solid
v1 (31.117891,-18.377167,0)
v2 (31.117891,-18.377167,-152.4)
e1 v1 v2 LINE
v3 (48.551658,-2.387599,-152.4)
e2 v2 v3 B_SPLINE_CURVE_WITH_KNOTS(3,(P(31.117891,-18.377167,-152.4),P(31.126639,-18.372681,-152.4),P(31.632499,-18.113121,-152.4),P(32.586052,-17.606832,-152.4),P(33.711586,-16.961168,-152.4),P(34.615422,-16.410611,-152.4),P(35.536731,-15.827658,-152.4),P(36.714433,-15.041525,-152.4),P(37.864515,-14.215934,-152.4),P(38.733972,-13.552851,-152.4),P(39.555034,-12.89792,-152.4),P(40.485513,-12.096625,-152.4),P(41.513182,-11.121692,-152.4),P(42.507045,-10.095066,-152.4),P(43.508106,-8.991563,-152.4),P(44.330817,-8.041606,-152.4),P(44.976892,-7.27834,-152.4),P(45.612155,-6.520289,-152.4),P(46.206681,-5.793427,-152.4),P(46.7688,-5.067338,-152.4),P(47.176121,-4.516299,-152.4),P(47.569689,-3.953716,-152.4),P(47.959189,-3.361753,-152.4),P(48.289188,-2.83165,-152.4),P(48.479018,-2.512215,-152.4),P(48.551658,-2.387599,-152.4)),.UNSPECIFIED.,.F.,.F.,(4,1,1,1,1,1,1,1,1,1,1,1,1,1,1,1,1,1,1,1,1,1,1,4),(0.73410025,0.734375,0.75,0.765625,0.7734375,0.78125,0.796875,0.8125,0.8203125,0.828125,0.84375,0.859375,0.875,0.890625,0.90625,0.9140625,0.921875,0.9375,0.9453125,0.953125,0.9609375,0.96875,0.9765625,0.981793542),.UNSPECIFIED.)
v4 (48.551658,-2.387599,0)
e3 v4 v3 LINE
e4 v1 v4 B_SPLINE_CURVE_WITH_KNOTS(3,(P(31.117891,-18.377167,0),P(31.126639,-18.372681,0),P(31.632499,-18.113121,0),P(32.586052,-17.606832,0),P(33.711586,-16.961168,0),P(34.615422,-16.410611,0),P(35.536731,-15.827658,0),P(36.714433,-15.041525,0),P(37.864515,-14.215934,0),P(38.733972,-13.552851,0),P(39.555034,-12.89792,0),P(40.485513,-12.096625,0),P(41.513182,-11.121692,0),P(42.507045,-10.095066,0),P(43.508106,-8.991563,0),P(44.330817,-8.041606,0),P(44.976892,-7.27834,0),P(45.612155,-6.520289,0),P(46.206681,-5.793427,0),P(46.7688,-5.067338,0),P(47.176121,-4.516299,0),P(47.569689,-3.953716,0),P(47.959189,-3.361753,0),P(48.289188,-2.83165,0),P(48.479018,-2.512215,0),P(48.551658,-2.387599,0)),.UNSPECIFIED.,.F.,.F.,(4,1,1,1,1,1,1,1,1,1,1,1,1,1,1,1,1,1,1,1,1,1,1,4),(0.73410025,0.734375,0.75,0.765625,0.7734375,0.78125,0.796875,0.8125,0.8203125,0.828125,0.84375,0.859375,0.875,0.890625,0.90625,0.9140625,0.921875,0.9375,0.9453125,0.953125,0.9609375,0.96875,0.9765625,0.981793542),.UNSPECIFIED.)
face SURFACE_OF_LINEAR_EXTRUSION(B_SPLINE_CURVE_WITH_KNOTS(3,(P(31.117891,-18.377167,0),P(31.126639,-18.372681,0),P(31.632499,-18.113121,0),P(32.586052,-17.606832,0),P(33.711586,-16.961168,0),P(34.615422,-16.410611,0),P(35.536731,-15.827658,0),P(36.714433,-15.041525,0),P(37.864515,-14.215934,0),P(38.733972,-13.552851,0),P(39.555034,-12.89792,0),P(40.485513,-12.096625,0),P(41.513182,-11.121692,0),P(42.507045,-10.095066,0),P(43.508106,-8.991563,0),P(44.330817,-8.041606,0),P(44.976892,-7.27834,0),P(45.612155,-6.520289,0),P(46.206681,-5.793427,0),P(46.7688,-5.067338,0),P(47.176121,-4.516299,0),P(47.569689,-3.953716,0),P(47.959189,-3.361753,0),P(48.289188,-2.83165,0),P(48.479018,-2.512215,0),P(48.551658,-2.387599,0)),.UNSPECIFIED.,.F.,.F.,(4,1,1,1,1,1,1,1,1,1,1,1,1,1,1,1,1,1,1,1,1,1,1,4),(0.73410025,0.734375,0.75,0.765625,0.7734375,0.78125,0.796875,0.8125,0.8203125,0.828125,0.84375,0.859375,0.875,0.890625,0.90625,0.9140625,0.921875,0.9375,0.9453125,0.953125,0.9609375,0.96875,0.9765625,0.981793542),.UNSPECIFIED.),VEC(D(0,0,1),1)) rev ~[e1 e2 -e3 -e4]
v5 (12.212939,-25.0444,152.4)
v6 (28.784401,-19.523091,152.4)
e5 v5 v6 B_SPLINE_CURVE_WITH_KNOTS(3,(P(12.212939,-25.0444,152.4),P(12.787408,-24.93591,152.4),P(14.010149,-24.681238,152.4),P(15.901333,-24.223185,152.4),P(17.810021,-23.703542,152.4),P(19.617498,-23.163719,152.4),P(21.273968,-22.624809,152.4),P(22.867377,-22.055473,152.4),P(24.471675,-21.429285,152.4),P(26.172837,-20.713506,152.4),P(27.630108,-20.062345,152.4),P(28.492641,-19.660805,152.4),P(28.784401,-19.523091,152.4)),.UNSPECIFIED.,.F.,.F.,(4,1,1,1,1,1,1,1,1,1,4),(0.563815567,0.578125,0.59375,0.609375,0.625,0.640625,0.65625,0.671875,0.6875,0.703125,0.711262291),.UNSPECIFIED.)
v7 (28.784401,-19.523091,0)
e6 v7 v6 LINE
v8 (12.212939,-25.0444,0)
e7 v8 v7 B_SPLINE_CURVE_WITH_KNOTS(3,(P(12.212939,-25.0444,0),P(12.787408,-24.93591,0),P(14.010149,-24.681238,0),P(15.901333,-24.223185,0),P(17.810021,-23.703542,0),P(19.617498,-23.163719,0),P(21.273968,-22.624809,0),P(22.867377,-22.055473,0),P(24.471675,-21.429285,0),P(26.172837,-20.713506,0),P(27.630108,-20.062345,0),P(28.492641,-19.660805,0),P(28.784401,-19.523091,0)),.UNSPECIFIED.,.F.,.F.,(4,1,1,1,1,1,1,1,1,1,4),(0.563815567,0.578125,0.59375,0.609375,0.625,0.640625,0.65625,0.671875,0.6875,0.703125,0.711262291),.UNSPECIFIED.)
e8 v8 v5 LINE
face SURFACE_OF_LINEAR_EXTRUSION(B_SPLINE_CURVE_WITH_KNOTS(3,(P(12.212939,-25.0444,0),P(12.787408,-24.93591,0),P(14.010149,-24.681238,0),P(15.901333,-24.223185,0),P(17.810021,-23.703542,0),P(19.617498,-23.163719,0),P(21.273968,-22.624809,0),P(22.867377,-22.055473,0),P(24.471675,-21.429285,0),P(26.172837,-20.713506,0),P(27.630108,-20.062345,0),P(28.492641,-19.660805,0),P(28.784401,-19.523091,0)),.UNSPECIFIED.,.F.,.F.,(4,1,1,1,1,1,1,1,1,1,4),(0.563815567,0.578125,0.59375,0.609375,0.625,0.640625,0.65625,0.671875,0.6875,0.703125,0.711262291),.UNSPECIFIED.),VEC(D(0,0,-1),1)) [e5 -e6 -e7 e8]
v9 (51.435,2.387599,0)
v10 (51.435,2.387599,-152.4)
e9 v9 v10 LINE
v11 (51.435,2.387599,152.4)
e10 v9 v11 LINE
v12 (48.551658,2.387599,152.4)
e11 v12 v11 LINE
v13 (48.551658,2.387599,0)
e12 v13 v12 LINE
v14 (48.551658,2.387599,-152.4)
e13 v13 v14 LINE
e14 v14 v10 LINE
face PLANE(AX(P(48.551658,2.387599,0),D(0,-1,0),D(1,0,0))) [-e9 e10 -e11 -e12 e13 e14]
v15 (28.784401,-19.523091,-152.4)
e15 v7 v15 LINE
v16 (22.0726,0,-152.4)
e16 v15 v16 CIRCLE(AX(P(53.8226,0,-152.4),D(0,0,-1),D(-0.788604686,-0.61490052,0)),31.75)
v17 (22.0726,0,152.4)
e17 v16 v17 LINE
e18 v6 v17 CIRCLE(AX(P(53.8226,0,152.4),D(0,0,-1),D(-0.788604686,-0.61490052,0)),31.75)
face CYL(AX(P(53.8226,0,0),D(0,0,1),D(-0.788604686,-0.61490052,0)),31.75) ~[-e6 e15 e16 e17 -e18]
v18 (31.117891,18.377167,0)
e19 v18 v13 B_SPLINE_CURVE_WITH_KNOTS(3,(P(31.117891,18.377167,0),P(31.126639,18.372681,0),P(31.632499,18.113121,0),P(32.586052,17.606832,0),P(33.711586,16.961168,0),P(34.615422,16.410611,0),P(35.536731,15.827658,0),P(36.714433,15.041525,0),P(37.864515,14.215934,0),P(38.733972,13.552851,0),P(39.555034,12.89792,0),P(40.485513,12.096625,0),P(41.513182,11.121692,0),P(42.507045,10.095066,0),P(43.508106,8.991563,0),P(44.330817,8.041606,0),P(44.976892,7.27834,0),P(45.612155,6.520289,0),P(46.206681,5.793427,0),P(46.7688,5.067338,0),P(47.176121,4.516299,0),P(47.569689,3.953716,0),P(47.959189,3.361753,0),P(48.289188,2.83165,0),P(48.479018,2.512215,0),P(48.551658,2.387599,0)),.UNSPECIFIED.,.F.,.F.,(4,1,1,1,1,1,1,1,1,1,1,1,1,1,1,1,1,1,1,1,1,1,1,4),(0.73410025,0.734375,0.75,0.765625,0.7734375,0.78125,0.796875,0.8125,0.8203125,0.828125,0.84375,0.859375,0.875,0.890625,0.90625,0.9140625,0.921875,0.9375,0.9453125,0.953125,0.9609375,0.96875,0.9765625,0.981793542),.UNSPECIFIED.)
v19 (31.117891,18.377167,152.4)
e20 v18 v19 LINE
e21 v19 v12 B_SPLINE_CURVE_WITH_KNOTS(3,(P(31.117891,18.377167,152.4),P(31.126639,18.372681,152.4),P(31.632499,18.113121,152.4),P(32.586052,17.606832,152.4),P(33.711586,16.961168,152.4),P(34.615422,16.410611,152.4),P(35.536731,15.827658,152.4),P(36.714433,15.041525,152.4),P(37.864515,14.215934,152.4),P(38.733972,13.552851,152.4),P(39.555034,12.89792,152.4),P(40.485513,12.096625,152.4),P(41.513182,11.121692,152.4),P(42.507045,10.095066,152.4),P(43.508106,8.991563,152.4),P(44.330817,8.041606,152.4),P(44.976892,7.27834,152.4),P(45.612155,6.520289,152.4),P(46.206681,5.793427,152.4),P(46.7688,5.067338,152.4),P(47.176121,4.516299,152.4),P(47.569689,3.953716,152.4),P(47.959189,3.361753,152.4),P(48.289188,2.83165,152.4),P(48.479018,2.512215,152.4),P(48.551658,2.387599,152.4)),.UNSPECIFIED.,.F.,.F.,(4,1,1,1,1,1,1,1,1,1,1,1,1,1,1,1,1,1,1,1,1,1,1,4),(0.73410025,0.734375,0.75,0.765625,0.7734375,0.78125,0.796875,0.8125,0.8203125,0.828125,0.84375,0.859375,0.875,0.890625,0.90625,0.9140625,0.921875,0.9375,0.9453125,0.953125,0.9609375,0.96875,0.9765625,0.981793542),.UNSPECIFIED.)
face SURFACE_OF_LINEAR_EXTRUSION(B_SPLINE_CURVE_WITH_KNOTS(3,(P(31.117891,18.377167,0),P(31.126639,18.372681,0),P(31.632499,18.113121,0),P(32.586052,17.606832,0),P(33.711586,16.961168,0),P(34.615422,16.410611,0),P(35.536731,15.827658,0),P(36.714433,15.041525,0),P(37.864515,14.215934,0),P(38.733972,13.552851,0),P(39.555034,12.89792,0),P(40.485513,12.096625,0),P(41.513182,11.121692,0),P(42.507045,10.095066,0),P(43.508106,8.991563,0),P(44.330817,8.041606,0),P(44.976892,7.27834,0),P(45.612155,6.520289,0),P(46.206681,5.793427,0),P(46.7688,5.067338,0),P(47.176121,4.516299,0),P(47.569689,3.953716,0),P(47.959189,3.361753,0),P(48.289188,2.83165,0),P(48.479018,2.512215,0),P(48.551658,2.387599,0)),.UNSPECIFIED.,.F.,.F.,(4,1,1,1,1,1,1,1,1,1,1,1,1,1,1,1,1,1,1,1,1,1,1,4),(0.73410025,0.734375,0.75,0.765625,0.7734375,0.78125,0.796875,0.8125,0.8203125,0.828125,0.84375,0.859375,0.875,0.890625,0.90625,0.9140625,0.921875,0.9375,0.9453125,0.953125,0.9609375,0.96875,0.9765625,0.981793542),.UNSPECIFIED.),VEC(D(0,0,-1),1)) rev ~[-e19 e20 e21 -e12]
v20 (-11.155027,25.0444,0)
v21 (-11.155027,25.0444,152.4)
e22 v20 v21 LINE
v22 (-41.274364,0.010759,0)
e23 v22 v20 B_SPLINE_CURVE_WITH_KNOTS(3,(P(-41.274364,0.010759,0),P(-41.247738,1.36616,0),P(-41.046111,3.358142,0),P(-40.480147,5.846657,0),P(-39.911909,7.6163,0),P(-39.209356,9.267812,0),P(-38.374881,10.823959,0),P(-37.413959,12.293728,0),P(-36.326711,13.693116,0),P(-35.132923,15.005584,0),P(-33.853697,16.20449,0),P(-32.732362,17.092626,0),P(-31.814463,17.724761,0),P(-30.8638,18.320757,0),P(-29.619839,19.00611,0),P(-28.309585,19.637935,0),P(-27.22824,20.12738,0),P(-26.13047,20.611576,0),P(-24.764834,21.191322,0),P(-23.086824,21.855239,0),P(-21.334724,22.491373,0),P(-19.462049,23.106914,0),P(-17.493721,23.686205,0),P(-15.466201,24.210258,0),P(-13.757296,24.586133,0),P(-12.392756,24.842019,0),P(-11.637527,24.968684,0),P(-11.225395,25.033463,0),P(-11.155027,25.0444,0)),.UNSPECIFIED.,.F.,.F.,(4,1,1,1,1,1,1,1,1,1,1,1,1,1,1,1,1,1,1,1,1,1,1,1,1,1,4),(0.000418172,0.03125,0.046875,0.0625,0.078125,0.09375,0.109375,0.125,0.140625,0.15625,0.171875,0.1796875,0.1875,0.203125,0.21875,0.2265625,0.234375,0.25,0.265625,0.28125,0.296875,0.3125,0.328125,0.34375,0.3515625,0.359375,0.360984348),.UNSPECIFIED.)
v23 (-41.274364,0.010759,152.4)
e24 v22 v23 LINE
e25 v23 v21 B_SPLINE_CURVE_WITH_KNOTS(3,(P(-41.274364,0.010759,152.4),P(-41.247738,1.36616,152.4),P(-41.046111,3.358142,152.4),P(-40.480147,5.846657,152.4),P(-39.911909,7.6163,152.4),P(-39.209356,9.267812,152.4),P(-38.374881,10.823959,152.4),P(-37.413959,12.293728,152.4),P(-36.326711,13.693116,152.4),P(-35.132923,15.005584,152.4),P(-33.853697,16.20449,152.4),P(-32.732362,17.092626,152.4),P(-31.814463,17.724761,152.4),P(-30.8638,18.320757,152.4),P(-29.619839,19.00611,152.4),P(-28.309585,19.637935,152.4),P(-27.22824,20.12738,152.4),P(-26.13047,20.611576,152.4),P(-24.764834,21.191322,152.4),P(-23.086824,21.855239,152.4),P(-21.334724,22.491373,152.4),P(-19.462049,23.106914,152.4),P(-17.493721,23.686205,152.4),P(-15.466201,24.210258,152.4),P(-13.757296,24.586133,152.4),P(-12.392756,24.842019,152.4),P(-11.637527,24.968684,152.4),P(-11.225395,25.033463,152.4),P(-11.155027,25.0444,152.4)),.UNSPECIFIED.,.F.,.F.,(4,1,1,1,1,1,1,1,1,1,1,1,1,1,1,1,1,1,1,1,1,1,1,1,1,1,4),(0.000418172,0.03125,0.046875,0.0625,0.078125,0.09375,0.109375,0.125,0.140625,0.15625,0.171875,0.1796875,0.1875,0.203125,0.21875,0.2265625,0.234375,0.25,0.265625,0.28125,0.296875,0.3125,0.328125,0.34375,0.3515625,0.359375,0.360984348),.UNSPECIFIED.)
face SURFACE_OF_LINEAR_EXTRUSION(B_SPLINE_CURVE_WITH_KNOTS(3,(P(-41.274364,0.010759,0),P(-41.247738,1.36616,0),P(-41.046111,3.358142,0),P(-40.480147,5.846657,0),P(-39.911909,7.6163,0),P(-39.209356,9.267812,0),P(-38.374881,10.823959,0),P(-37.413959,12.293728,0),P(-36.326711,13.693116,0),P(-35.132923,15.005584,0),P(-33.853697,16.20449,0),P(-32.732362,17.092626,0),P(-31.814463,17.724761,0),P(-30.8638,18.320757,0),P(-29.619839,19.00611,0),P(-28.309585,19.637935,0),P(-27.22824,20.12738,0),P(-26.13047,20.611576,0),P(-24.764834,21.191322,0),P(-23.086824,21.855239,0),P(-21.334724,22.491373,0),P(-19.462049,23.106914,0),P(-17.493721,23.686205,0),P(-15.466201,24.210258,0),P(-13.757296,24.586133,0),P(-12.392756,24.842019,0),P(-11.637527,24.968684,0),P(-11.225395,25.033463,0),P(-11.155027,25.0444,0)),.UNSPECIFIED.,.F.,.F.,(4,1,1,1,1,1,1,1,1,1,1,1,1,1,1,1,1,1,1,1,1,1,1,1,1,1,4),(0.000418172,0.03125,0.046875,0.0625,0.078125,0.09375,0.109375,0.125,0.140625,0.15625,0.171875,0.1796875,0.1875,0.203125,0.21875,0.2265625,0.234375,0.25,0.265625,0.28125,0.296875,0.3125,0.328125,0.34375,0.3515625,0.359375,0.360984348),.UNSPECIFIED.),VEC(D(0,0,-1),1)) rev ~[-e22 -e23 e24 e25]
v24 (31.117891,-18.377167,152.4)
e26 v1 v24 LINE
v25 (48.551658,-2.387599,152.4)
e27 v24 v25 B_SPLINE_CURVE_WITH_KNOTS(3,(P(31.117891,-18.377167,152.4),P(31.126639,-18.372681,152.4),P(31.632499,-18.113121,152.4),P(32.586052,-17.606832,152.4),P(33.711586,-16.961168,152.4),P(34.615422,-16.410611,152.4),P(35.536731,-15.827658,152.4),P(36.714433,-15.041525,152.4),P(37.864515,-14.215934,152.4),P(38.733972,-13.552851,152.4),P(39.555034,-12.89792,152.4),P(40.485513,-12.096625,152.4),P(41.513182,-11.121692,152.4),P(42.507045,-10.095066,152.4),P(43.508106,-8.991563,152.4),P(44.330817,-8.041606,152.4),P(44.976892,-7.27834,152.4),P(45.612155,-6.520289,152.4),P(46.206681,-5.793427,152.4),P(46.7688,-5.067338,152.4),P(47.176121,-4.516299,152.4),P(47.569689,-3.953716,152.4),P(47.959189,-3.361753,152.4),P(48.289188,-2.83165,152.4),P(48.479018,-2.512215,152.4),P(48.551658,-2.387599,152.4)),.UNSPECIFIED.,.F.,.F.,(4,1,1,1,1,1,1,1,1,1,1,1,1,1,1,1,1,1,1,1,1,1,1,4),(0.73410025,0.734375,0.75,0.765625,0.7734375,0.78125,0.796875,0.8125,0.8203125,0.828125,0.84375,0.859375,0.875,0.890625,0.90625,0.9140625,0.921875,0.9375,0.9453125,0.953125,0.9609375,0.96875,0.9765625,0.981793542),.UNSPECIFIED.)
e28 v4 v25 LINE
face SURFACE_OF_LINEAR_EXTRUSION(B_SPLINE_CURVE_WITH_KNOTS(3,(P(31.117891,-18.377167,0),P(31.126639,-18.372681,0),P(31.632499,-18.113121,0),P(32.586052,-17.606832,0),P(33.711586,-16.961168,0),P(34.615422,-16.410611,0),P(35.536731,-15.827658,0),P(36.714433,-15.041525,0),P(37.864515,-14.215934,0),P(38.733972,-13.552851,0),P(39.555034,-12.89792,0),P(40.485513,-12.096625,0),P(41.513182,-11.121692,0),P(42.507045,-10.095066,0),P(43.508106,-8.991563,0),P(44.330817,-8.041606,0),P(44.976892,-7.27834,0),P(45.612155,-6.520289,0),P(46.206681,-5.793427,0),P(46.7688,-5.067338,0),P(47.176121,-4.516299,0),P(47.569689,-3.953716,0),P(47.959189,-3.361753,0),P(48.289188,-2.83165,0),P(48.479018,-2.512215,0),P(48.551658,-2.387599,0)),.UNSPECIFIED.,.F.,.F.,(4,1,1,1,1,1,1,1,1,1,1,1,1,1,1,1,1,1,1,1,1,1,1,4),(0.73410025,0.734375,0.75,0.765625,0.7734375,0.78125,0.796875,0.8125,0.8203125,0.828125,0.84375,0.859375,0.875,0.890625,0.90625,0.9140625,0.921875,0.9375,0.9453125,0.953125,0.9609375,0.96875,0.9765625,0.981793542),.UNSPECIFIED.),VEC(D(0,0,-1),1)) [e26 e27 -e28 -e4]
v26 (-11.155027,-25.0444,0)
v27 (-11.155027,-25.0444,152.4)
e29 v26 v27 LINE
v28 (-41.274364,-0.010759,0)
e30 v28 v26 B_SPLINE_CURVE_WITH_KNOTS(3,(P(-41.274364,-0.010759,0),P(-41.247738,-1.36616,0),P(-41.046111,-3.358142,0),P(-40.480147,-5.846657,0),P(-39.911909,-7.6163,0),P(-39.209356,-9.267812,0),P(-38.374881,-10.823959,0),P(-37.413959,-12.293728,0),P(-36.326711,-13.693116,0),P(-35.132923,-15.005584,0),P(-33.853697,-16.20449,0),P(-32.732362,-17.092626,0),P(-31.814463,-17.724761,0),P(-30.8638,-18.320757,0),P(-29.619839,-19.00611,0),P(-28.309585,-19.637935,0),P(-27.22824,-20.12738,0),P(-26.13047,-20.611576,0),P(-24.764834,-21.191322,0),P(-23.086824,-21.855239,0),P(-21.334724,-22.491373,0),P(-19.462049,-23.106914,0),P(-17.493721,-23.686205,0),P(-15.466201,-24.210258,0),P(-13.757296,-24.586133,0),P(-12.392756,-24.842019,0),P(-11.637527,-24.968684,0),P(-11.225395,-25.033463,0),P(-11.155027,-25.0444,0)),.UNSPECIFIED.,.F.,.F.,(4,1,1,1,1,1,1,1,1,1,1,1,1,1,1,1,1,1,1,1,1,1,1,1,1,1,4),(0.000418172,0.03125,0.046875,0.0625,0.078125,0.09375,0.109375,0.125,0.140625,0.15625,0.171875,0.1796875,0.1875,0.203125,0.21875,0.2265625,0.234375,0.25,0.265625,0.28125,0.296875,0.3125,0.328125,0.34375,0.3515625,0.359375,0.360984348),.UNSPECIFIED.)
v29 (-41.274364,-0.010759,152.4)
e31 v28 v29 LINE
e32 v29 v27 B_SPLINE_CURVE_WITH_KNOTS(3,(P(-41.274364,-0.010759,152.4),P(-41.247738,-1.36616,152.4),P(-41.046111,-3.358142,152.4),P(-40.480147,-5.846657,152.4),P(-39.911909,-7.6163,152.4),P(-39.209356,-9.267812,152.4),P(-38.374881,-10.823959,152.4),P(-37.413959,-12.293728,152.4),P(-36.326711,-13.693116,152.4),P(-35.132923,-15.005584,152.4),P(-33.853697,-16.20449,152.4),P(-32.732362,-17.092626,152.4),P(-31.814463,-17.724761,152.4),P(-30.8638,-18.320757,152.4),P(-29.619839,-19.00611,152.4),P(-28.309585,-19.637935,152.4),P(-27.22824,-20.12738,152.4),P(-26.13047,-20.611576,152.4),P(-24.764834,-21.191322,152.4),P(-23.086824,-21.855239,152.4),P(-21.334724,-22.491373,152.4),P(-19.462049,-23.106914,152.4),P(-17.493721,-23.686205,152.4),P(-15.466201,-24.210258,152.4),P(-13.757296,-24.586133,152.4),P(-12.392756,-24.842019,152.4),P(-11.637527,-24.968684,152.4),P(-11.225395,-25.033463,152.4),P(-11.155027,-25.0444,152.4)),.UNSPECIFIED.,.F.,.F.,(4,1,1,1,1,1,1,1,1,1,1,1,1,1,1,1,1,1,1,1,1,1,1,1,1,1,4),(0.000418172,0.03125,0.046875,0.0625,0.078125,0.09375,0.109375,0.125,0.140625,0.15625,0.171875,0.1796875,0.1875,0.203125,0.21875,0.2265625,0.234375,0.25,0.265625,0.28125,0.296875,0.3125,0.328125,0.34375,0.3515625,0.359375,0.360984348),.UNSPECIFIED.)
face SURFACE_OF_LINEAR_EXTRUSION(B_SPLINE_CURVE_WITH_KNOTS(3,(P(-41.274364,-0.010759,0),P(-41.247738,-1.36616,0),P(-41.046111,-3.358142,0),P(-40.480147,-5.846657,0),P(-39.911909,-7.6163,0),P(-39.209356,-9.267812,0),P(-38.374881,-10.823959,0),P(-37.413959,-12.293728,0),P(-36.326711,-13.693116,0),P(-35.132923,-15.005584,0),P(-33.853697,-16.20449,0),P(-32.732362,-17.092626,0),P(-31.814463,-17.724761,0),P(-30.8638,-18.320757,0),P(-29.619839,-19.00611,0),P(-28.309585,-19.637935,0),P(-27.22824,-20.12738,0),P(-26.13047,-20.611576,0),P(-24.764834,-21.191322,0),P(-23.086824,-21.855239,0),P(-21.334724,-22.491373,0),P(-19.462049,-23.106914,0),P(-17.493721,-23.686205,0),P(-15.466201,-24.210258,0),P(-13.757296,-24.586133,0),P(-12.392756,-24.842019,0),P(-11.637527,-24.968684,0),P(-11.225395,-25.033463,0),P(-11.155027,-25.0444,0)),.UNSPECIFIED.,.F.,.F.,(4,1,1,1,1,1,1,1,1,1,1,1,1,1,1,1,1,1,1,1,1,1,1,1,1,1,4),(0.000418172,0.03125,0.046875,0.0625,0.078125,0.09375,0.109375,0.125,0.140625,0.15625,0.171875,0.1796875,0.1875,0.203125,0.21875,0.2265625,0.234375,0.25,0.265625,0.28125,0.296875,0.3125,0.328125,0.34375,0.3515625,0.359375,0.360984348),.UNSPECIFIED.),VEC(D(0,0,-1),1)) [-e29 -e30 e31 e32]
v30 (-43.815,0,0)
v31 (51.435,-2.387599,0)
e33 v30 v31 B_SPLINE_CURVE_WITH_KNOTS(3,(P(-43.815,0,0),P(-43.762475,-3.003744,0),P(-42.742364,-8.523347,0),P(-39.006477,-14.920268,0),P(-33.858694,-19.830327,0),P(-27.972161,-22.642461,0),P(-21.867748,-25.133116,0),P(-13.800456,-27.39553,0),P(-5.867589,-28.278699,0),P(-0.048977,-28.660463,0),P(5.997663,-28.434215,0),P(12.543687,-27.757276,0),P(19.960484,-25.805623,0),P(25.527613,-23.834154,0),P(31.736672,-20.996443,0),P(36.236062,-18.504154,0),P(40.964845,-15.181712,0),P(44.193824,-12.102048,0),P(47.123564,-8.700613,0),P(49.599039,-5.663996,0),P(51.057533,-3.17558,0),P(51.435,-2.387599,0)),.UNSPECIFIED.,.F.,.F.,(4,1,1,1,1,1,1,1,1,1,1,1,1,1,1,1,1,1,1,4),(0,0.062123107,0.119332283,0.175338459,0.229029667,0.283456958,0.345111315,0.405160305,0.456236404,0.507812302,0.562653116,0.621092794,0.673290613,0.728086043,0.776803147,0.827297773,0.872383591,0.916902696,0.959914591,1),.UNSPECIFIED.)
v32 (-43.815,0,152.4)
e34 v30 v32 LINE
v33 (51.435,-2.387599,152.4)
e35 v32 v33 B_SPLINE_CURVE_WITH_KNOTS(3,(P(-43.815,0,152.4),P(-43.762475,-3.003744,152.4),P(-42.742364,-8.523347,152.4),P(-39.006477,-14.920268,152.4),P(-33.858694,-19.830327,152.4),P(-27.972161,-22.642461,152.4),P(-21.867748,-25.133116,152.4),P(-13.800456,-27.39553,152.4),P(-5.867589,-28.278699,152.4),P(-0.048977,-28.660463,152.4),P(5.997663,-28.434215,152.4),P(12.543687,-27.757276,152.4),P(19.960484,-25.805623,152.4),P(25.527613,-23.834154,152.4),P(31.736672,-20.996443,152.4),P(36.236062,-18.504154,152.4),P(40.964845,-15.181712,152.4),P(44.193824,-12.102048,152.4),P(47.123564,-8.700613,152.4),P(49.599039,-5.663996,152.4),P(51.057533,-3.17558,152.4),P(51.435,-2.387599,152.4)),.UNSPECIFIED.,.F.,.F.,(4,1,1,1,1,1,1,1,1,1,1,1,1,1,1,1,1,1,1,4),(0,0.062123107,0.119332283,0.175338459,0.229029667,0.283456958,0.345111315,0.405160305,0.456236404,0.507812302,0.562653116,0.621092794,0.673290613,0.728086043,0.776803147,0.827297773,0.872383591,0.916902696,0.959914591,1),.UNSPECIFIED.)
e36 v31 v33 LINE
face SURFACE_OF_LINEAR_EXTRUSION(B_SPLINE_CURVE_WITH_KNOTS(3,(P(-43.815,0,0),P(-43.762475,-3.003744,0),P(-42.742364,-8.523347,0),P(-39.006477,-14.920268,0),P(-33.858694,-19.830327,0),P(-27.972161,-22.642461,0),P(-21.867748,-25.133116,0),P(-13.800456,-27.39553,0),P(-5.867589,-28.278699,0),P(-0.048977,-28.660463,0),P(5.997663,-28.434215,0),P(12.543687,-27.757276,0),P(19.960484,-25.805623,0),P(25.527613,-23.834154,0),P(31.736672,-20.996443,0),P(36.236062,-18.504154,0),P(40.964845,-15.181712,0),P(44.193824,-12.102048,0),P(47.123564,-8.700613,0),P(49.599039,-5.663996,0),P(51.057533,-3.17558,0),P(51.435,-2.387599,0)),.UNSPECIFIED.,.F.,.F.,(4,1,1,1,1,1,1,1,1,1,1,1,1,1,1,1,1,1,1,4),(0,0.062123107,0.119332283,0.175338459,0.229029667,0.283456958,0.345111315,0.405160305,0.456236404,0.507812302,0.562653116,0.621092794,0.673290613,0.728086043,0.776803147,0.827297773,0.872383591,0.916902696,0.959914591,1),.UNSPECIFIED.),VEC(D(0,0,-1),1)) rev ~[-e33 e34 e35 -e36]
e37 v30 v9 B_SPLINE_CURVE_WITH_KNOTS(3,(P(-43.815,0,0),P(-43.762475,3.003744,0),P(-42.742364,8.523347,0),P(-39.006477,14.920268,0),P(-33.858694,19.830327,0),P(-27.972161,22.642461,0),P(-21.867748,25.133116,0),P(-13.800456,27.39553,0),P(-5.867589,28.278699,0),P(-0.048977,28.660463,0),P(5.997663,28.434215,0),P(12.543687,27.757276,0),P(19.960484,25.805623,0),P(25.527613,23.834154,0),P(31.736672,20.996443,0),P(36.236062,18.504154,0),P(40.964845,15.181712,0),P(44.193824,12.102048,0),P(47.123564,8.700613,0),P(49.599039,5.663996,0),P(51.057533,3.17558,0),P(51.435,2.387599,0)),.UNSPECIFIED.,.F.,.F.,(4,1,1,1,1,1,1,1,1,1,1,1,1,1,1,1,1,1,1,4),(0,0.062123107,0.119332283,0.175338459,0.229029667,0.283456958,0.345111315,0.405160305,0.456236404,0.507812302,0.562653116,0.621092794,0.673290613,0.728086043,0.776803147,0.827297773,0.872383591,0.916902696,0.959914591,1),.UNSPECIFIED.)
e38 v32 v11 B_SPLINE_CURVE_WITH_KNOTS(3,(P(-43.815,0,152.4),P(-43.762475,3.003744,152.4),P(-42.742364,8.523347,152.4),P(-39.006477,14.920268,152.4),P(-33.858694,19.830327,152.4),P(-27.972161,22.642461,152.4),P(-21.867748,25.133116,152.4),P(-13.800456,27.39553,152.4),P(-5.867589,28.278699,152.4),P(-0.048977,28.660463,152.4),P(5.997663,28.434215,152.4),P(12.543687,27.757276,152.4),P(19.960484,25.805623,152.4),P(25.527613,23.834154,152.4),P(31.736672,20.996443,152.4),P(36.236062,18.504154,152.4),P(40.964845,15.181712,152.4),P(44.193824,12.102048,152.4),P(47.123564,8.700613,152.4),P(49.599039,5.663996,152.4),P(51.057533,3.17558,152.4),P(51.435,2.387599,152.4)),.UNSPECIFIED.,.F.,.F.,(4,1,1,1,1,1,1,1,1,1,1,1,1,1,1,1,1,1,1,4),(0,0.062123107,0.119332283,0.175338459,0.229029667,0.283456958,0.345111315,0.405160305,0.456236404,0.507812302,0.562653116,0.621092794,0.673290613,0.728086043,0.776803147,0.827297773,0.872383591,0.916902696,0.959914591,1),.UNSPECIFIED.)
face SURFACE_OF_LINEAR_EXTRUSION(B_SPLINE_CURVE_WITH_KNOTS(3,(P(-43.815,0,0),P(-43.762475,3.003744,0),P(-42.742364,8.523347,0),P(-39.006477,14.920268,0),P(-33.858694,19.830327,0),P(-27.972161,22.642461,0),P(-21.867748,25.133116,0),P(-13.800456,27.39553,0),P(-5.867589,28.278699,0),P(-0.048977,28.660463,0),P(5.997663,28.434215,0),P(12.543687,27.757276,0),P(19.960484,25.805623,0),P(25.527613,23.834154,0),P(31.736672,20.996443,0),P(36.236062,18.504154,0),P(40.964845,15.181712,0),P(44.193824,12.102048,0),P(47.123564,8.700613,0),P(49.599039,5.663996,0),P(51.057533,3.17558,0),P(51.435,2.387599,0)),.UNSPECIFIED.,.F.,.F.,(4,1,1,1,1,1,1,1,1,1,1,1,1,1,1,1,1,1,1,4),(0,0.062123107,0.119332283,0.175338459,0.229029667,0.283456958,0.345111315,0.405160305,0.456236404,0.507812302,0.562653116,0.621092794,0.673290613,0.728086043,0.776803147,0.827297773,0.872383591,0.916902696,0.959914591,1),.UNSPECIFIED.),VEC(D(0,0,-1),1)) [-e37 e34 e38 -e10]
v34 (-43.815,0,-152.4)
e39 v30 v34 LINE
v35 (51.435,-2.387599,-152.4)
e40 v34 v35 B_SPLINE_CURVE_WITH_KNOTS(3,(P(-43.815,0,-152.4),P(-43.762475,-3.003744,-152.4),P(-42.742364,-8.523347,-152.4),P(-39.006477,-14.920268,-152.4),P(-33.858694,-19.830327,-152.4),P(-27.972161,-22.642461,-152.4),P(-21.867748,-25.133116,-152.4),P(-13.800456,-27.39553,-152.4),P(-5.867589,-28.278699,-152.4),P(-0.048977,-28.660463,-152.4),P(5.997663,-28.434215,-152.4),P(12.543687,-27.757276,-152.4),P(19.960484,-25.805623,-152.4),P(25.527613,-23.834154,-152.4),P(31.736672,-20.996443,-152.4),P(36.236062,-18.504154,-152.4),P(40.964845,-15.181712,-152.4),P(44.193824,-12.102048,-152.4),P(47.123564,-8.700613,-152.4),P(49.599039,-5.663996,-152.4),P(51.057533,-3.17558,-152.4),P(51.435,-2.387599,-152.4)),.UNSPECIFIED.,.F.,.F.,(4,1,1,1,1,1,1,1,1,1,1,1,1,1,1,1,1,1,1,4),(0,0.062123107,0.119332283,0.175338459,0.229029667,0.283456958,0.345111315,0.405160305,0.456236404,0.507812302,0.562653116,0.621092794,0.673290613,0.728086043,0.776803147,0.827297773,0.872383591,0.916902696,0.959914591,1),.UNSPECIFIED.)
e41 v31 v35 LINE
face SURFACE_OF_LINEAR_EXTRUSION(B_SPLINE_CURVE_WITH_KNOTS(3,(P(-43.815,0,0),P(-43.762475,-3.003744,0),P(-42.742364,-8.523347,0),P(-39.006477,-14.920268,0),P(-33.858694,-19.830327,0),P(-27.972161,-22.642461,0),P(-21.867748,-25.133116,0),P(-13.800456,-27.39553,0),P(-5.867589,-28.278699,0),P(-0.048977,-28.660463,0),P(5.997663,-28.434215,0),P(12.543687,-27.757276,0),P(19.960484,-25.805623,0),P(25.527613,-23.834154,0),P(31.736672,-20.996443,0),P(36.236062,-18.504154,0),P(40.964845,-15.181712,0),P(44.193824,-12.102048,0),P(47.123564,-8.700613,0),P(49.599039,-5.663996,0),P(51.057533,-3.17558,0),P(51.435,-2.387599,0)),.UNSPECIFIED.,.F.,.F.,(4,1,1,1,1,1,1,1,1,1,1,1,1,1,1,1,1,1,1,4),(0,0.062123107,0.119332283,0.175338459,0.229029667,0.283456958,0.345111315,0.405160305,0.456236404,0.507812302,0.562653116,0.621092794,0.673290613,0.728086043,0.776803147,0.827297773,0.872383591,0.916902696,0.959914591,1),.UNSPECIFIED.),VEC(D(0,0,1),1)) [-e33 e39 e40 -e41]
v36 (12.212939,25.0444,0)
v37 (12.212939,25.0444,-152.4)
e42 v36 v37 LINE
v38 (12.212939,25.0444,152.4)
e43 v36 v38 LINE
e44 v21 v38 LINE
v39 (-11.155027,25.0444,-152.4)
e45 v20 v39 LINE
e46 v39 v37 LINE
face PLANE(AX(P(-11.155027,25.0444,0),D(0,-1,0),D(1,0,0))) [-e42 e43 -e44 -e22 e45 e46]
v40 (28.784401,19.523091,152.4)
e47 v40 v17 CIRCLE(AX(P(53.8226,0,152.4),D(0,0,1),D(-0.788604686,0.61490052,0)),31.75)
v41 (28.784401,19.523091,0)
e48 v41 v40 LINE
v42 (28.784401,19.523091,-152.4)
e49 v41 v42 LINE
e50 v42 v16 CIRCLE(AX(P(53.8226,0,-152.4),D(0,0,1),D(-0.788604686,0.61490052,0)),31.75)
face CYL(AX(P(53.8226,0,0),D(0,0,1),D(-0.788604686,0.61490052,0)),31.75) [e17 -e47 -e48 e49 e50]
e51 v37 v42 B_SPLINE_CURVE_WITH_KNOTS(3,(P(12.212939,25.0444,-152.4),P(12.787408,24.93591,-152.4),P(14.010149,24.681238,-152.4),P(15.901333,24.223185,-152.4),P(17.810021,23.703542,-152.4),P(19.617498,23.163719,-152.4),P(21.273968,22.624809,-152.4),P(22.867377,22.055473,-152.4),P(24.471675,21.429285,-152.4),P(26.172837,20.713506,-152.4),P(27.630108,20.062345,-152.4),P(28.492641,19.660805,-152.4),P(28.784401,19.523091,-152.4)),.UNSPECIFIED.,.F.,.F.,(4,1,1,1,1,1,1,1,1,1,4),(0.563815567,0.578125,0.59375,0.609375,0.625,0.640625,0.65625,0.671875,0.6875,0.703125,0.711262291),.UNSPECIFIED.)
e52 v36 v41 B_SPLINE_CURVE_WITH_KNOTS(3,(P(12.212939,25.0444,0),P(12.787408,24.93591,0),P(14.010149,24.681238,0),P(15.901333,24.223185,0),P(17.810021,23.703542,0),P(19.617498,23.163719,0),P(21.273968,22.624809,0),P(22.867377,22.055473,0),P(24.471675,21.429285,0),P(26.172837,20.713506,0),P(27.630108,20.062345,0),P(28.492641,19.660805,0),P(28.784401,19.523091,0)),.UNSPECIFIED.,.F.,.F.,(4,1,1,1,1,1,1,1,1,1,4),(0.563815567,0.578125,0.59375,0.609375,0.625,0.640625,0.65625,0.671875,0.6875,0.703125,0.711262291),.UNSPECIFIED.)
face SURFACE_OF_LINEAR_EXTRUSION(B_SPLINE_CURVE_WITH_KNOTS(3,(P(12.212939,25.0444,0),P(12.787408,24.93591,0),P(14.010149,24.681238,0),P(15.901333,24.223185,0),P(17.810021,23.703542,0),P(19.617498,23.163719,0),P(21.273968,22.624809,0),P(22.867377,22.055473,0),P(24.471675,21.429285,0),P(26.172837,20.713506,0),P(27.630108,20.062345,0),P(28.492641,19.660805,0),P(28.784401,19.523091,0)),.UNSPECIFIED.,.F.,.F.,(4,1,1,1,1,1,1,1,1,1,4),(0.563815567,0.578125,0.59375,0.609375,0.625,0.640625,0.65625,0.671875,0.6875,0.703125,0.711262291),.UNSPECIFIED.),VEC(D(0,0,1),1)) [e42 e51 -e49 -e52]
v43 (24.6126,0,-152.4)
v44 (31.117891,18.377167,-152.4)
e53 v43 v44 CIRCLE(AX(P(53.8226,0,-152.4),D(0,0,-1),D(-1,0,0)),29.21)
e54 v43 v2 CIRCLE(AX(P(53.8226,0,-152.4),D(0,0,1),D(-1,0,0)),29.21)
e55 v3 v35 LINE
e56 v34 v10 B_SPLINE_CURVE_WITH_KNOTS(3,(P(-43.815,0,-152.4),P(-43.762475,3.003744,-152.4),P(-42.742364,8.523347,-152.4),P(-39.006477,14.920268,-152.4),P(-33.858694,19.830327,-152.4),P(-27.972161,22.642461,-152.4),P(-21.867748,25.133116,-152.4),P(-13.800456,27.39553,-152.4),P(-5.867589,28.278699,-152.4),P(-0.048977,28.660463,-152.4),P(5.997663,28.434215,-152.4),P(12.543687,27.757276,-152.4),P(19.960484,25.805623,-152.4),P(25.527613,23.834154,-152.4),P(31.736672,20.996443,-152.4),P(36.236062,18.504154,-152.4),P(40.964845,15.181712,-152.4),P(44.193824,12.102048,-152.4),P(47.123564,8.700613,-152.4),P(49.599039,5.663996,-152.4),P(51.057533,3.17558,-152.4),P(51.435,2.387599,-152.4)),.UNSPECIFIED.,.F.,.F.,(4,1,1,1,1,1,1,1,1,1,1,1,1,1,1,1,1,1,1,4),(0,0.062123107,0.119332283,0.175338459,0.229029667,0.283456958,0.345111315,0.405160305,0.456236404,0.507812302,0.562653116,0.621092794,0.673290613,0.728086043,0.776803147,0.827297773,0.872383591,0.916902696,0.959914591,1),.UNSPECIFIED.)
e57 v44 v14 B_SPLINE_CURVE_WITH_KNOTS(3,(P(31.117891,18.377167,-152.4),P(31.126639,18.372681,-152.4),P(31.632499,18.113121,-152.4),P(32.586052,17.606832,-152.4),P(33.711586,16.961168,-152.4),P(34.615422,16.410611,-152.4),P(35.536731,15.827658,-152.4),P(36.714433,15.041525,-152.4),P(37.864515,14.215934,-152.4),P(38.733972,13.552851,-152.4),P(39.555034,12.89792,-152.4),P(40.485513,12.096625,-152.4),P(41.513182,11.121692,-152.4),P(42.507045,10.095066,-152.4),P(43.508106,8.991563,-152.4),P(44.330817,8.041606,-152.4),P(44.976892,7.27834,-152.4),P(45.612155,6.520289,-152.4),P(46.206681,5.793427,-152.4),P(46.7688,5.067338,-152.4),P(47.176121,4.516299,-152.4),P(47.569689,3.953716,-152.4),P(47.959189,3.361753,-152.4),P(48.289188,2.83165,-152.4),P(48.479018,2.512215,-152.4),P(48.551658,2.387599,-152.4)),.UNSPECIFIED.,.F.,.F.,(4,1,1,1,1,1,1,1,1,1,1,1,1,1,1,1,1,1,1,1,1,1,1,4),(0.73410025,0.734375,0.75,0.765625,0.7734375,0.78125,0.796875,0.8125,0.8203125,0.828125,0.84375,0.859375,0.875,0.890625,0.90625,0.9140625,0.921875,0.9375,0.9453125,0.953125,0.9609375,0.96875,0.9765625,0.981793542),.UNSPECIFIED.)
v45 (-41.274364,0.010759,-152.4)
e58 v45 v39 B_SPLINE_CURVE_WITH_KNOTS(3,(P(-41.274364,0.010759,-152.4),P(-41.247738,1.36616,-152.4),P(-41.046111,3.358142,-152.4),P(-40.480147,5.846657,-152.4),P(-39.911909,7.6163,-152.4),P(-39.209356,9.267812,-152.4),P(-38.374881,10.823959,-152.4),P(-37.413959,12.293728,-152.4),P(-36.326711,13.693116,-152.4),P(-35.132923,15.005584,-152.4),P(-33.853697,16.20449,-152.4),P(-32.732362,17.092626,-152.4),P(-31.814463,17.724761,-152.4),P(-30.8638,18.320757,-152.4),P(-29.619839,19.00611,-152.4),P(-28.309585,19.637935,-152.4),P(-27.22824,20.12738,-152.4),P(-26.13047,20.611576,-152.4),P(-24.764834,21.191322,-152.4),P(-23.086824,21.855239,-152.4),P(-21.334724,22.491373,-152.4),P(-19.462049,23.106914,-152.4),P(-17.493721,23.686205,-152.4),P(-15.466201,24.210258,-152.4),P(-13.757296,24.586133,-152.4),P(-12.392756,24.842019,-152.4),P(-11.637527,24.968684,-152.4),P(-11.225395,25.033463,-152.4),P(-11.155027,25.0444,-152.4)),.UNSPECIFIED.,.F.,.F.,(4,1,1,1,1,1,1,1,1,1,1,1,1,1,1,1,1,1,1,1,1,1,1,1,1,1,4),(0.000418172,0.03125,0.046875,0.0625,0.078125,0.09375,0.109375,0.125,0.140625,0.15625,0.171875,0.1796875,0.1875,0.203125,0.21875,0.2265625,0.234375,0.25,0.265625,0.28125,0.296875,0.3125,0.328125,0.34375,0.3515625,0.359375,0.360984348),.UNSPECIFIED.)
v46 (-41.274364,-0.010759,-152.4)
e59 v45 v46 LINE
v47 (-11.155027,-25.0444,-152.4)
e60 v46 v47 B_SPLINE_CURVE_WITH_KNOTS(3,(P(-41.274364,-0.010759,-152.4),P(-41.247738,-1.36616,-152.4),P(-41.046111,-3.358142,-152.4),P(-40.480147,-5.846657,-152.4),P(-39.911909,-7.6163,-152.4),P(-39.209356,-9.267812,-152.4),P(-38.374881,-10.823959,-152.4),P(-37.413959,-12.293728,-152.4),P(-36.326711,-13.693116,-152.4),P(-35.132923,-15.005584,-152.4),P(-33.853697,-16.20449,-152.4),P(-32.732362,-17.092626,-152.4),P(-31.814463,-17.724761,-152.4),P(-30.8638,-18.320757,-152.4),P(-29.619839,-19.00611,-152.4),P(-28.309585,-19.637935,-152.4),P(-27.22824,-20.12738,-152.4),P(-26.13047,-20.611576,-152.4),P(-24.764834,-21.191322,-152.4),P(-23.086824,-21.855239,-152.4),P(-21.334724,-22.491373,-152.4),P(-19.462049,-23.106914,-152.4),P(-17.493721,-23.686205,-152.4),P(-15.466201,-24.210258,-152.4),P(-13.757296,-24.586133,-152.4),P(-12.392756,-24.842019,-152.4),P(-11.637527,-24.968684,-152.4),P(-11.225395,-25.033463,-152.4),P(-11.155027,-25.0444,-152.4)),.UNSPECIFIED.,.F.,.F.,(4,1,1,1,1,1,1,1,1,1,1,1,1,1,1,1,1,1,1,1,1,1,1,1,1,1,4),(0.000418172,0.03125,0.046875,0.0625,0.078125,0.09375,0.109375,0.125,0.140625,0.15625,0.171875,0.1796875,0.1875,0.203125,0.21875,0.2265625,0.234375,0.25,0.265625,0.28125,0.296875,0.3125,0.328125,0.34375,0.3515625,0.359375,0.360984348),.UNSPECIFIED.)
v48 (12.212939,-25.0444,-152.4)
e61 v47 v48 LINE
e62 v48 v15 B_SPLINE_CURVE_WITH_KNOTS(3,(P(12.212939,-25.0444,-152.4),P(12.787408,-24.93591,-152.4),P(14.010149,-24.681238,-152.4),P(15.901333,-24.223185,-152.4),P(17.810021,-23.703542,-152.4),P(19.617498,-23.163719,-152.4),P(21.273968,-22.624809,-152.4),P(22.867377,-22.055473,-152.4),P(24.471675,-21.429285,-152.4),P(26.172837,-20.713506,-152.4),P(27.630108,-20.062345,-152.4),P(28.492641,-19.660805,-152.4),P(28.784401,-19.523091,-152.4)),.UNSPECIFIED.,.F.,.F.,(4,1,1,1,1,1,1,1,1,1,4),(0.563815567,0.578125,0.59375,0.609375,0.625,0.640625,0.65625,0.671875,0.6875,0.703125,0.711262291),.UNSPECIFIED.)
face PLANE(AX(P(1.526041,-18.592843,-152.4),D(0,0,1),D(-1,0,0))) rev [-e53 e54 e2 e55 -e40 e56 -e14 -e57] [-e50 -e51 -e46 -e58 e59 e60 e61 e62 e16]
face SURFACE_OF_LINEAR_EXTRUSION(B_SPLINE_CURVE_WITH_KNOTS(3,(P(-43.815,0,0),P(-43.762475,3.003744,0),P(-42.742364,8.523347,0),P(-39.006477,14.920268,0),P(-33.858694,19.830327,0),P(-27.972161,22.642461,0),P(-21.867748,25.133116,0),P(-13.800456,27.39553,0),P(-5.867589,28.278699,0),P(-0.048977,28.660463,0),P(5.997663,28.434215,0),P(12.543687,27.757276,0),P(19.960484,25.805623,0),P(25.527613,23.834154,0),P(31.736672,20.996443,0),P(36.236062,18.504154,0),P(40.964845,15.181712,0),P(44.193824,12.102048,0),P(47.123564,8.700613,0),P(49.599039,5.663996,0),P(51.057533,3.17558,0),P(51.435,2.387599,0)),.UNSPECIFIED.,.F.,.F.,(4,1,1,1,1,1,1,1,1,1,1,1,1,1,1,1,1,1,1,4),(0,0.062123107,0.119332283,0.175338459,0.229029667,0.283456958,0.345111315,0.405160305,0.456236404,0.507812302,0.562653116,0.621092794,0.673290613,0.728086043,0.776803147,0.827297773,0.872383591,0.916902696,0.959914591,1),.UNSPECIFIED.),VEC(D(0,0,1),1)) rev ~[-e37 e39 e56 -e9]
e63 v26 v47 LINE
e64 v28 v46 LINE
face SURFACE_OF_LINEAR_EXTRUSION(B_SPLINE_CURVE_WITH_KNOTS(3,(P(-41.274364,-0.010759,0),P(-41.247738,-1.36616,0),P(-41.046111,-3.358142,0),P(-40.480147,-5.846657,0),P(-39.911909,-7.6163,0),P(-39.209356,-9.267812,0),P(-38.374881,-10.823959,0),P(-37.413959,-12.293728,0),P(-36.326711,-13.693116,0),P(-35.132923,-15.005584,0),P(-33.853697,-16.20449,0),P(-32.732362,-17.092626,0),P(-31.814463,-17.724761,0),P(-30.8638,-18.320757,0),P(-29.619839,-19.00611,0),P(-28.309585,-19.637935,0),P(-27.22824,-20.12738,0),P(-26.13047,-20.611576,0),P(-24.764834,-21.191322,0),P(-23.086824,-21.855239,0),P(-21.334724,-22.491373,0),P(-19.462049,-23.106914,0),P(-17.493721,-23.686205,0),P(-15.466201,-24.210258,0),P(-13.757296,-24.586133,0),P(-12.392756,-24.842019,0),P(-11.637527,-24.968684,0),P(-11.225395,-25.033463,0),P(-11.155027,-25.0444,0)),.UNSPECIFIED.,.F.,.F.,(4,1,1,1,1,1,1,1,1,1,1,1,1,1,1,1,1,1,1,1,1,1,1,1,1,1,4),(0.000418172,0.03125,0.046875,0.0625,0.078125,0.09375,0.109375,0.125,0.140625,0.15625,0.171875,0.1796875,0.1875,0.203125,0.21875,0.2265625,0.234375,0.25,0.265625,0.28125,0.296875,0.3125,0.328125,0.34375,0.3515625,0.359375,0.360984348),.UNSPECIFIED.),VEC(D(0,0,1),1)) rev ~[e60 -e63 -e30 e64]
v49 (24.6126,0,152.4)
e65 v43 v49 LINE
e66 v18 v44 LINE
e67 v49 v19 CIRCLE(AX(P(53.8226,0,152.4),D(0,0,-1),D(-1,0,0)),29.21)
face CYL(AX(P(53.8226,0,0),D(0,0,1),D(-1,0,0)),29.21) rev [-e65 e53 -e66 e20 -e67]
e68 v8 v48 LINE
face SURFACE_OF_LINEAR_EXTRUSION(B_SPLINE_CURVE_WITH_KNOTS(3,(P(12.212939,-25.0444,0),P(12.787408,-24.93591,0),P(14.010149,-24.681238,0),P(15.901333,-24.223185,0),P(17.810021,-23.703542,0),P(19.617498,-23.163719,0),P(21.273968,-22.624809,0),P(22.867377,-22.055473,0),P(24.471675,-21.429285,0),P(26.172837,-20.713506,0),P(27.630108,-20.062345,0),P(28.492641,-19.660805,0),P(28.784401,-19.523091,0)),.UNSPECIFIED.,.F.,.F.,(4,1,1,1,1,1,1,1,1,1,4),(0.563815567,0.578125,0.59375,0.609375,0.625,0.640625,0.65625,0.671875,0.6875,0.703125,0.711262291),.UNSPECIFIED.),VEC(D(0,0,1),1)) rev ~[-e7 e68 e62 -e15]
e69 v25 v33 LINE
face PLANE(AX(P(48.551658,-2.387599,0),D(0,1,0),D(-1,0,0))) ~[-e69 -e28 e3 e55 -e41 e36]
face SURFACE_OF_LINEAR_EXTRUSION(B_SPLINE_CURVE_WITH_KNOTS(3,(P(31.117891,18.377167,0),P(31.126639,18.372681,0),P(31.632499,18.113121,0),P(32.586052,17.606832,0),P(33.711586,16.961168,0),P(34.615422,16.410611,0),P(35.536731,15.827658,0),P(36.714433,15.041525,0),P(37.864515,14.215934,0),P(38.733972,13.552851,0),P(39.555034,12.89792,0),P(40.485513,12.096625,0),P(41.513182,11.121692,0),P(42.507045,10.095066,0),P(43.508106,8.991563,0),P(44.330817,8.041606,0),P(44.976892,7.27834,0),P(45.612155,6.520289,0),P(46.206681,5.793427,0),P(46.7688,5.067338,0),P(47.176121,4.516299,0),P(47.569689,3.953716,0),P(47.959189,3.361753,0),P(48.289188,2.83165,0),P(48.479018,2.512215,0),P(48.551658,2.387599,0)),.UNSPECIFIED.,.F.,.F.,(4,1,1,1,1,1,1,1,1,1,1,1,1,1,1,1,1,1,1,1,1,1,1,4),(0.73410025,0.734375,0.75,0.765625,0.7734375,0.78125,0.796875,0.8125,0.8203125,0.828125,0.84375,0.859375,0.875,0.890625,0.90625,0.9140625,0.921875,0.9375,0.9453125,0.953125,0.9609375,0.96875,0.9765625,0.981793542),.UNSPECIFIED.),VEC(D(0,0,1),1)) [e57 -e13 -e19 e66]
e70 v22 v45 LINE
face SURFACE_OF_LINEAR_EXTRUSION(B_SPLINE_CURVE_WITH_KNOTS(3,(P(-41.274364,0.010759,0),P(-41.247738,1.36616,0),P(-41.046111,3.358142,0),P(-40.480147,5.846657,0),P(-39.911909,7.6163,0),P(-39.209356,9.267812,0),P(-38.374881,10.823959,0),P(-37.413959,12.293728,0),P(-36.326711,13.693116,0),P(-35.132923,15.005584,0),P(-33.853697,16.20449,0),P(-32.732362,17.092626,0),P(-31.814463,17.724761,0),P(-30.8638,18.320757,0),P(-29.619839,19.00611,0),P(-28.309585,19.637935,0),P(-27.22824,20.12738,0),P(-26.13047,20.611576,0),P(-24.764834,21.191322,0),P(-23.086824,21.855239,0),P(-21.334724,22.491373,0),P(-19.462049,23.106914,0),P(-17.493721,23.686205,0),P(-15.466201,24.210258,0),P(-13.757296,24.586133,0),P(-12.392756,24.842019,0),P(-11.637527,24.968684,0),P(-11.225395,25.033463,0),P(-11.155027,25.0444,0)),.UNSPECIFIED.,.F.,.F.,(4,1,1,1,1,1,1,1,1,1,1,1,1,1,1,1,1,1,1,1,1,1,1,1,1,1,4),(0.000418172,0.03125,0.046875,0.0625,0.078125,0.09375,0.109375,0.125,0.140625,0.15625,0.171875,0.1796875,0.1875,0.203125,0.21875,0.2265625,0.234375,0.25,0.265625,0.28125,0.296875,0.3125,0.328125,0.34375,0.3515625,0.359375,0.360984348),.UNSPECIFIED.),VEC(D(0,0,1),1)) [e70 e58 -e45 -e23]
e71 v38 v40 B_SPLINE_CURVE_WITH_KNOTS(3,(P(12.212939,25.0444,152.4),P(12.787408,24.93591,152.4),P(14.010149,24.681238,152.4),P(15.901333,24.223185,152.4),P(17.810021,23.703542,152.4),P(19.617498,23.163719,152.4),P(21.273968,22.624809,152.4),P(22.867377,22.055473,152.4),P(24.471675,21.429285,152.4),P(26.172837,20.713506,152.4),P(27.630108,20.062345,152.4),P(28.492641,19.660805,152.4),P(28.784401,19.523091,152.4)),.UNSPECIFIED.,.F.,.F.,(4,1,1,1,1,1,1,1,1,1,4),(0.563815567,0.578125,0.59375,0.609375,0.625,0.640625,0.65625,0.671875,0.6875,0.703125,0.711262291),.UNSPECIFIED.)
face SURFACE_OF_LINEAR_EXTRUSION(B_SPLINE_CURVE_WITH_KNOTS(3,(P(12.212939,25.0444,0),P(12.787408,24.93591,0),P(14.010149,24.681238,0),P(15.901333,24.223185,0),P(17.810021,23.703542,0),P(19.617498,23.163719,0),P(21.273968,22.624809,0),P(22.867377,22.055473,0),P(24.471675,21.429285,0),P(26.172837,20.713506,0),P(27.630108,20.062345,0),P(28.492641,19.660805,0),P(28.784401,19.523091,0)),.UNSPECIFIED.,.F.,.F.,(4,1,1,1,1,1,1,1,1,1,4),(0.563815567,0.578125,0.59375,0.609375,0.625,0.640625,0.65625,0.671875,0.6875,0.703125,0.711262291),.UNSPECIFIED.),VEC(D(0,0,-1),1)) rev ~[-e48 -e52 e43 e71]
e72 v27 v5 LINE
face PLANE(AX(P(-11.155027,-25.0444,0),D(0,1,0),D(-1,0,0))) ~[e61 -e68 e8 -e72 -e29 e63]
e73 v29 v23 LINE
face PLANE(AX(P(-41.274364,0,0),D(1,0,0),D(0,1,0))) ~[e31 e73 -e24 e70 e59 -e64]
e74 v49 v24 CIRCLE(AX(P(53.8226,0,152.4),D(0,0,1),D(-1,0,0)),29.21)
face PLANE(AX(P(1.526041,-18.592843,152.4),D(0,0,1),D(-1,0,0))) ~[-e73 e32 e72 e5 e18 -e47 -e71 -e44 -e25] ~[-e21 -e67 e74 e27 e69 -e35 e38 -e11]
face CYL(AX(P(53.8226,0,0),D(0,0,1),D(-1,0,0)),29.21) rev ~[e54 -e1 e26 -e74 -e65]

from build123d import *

# Parameters (mm, degrees)
F19_DEPTH = 152.4


# Not quite as in the source:
# - ends of sketch curves that miss each other by under 0.0002 mm in the source are joined
# - the dataset's text gives a spline's control points without its knots; the knots are read off the source's solid


with BuildPart() as f19:
    # F18 (on Top) → F19 (new body, symmetric)
    with BuildSketch(Plane.XY):
        with BuildLine():
            Line((-43.815, 0), (-41.274364031, 0))
            Line((-41.274364031, 0), (-41.274364031, 0.0107594472))
            add(Edge.make_bspline(
                [(-41.274364031, 0.0107594472), (-41.2477378711, 1.3661596464), (-41.0461105432, 3.3581416359), (-40.4801466689, 5.8466573854), (-39.9119087851, 7.6163003428), (-39.2093555266, 9.2678119356), (-38.3748806106, 10.8239592565), (-37.4139591197, 12.2937284374), (-36.3267110013, 13.6931162157), (-35.132922694, 15.0055835598), (-33.8536965602, 16.2044904338), (-32.7323620837, 17.0926256482), (-31.8144631315, 17.7247613585), (-30.8637995003, 18.320756782), (-29.6198390803, 19.0061104284), (-28.309584962, 19.6379349174), (-27.2282396619, 20.1273797903), (-26.1304699992, 20.6115762704), (-24.7648344807, 21.1913224862), (-23.0868238206, 21.8552392863), (-21.3347237158, 22.4913734007), (-19.4620491678, 23.1069136256), (-17.4937213532, 23.686204789), (-15.4662009879, 24.2102580953), (-13.7572955835, 24.586132952), (-12.3927559261, 24.8420192302), (-11.6375273995, 24.9686838433), (-11.2253951687, 25.0334630626), (-11.1550271773, 25.0444)],
                knots=[0.0004181716, 0.0004181716, 0.0004181716, 0.0004181716, 0.03125, 0.046875, 0.0625, 0.078125, 0.09375, 0.109375, 0.125, 0.140625, 0.15625, 0.171875, 0.1796875, 0.1875, 0.203125, 0.21875, 0.2265625, 0.234375, 0.25, 0.265625, 0.28125, 0.296875, 0.3125, 0.328125, 0.34375, 0.3515625, 0.359375, 0.3609843483, 0.3609843483, 0.3609843483, 0.3609843483], degree=3))
            add(Edge.make_bspline(
                [(-11.1550271773, 25.0444), (-10.542199434, 25.1396486856), (-9.2507341781, 25.3205491936), (-7.3235060256, 25.5409372807), (-5.4062672912, 25.7225029254), (-3.6259707874, 25.8679167236), (-1.9439119364, 25.9703614265), (-0.3024423735, 26.0267386411), (1.3666901148, 26.0318853631), (3.0841459509, 25.9889379786), (4.8358815804, 25.9022176908), (6.6182508403, 25.7782185761), (8.3995657193, 25.6136085287), (10.204227939, 25.3891398197), (11.4811176273, 25.1813705052), (12.1601242469, 25.054374244), (12.212939209, 25.0444)],
                knots=[0.3609843483, 0.3609843483, 0.3609843483, 0.3609843483, 0.375, 0.390625, 0.40625, 0.421875, 0.4375, 0.453125, 0.46875, 0.484375, 0.5, 0.515625, 0.53125, 0.546875, 0.5625, 0.5638155672, 0.5638155672, 0.5638155672, 0.5638155672], degree=3))
            add(Edge.make_bspline(
                [(12.212939209, 25.0444), (12.7874079098, 24.935910081), (14.0101485763, 24.6812380165), (15.9013332093, 24.223185306), (17.8100208417, 23.7035416368), (19.6174982681, 23.1637186381), (21.2739675555, 22.6248092168), (22.8673765228, 22.055473021), (24.4716753523, 21.4292847031), (26.1728368077, 20.713506069), (27.630108265, 20.0623448256), (28.4926410945, 19.6608053042), (28.7844012144, 19.5230914963)],
                knots=[0.5638155672, 0.5638155672, 0.5638155672, 0.5638155672, 0.578125, 0.59375, 0.609375, 0.625, 0.640625, 0.65625, 0.671875, 0.6875, 0.703125, 0.7112622913, 0.7112622913, 0.7112622913, 0.7112622913], degree=3))
            add(Edge.make_bspline(
                [(28.7844012144, 19.5230914963), (29.0528707495, 19.3963710863), (29.5952084994, 19.137073037), (30.3776220144, 18.752869828), (30.8778676399, 18.5002539174), (31.1178905157, 18.3771670078)],
                knots=[0.7112622913, 0.7112622913, 0.7112622913, 0.7112622913, 0.71875, 0.7265625, 0.7341002498, 0.7341002498, 0.7341002498, 0.7341002498], degree=3))
            add(Edge.make_bspline(
                [(31.1178905157, 18.3771670078), (31.1266393253, 18.3726805023), (31.632499174, 18.1131209993), (32.5860521639, 17.6068316634), (33.7115864947, 16.9611680115), (34.6154219638, 16.4106109289), (35.5367313786, 15.8276579527), (36.7144333728, 15.0415250136), (37.8645154123, 14.2159344045), (38.733972339, 13.5528506756), (39.5550337441, 12.8979203915), (40.4855128205, 12.0966248777), (41.5131824676, 11.1216924507), (42.5070446229, 10.0950657817), (43.5081058577, 8.991562716), (44.3308167156, 8.0416058596), (44.976892336, 7.278340365), (45.6121545757, 6.5202886328), (46.2066805308, 5.793426823), (46.7687995513, 5.0673381808), (47.1761207946, 4.5162992747), (47.5696893531, 3.9537164713), (47.9591886693, 3.3617532401), (48.2891878893, 2.8316504671), (48.4790184853, 2.5122153516), (48.5516575282, 2.3875989692)],
                knots=[0.7341002498, 0.7341002498, 0.7341002498, 0.7341002498, 0.734375, 0.75, 0.765625, 0.7734375, 0.78125, 0.796875, 0.8125, 0.8203125, 0.828125, 0.84375, 0.859375, 0.875, 0.890625, 0.90625, 0.9140625, 0.921875, 0.9375, 0.9453125, 0.953125, 0.9609375, 0.96875, 0.9765625, 0.9817935421, 0.9817935421, 0.9817935421, 0.9817935421], degree=3))
            Line((48.5516575282, 2.3875989692), (51.435, 2.3875989692))
            add(Edge.make_bspline(
                [(-43.815, 0), (-43.7624752522, 3.0037439428), (-42.7423638876, 8.5233473205), (-39.0064769176, 14.9202682328), (-33.8586937997, 19.8303271293), (-27.9721607189, 22.6424605748), (-21.8677478175, 25.1331163292), (-13.8004564967, 27.3955304745), (-5.8675891054, 28.2786991968), (-0.0489766797, 28.6604633775), (5.9976629011, 28.4342151338), (12.5436865646, 27.7572763922), (19.9604839819, 25.8056227743), (25.5276133686, 23.8341537712), (31.7366717098, 20.9964428844), (36.2360615235, 18.5041540338), (40.964844667, 15.1817120352), (44.1938244908, 12.1020479683), (47.1235637345, 8.7006128803), (49.599038946, 5.6639958266), (51.0575334731, 3.1755801978), (51.435, 2.3875989692)],
                knots=[0, 0, 0, 0, 0.0621231068, 0.1193322831, 0.1753384592, 0.2290296673, 0.2834569581, 0.3451113152, 0.4051603052, 0.456236404, 0.5078123021, 0.5626531156, 0.6210927937, 0.6732906127, 0.7280860429, 0.7768031474, 0.8272977729, 0.8723835911, 0.9169026962, 0.9599145905, 1, 1, 1, 1], degree=3))
        make_face()
        with BuildLine():
            add(Edge.make_bspline(
                [(-11.1550271773, 25.0444), (-10.542199434, 25.1396486856), (-9.2507341781, 25.3205491936), (-7.3235060256, 25.5409372807), (-5.4062672912, 25.7225029254), (-3.6259707874, 25.8679167236), (-1.9439119364, 25.9703614265), (-0.3024423735, 26.0267386411), (1.3666901148, 26.0318853631), (3.0841459509, 25.9889379786), (4.8358815804, 25.9022176908), (6.6182508403, 25.7782185761), (8.3995657193, 25.6136085287), (10.204227939, 25.3891398197), (11.4811176273, 25.1813705052), (12.1601242469, 25.054374244), (12.212939209, 25.0444)],
                knots=[0.3609843483, 0.3609843483, 0.3609843483, 0.3609843483, 0.375, 0.390625, 0.40625, 0.421875, 0.4375, 0.453125, 0.46875, 0.484375, 0.5, 0.515625, 0.53125, 0.546875, 0.5625, 0.5638155672, 0.5638155672, 0.5638155672, 0.5638155672], degree=3))
            Line((-11.1550271773, 25.0444), (12.212939209, 25.0444))
        make_face()
        with BuildLine():
            add(Edge.make_bspline(
                [(28.7844012144, 19.5230914963), (29.0528707495, 19.3963710863), (29.5952084994, 19.137073037), (30.3776220144, 18.752869828), (30.8778676399, 18.5002539174), (31.1178905157, 18.3771670078)],
                knots=[0.7112622913, 0.7112622913, 0.7112622913, 0.7112622913, 0.71875, 0.7265625, 0.7341002498, 0.7341002498, 0.7341002498, 0.7341002498], degree=3))
            ThreePointArc((28.7844012144, 19.5230914963), (23.7973996556, 10.322298401), (22.0726, 0))
            Line((22.0726, 0), (24.6126, 0))
            ThreePointArc((24.6126, 0), (26.2869080345, 9.7472954188), (31.1178905157, 18.3771670078))
        make_face()
    extrude(amount=F19_DEPTH, both=True)

    # F20: F19 across plane


with BuildPart() as f19_1:
    add(f19.part)
    add(f19.part.mirror(Plane.XZ))


solid = f19_1.part
